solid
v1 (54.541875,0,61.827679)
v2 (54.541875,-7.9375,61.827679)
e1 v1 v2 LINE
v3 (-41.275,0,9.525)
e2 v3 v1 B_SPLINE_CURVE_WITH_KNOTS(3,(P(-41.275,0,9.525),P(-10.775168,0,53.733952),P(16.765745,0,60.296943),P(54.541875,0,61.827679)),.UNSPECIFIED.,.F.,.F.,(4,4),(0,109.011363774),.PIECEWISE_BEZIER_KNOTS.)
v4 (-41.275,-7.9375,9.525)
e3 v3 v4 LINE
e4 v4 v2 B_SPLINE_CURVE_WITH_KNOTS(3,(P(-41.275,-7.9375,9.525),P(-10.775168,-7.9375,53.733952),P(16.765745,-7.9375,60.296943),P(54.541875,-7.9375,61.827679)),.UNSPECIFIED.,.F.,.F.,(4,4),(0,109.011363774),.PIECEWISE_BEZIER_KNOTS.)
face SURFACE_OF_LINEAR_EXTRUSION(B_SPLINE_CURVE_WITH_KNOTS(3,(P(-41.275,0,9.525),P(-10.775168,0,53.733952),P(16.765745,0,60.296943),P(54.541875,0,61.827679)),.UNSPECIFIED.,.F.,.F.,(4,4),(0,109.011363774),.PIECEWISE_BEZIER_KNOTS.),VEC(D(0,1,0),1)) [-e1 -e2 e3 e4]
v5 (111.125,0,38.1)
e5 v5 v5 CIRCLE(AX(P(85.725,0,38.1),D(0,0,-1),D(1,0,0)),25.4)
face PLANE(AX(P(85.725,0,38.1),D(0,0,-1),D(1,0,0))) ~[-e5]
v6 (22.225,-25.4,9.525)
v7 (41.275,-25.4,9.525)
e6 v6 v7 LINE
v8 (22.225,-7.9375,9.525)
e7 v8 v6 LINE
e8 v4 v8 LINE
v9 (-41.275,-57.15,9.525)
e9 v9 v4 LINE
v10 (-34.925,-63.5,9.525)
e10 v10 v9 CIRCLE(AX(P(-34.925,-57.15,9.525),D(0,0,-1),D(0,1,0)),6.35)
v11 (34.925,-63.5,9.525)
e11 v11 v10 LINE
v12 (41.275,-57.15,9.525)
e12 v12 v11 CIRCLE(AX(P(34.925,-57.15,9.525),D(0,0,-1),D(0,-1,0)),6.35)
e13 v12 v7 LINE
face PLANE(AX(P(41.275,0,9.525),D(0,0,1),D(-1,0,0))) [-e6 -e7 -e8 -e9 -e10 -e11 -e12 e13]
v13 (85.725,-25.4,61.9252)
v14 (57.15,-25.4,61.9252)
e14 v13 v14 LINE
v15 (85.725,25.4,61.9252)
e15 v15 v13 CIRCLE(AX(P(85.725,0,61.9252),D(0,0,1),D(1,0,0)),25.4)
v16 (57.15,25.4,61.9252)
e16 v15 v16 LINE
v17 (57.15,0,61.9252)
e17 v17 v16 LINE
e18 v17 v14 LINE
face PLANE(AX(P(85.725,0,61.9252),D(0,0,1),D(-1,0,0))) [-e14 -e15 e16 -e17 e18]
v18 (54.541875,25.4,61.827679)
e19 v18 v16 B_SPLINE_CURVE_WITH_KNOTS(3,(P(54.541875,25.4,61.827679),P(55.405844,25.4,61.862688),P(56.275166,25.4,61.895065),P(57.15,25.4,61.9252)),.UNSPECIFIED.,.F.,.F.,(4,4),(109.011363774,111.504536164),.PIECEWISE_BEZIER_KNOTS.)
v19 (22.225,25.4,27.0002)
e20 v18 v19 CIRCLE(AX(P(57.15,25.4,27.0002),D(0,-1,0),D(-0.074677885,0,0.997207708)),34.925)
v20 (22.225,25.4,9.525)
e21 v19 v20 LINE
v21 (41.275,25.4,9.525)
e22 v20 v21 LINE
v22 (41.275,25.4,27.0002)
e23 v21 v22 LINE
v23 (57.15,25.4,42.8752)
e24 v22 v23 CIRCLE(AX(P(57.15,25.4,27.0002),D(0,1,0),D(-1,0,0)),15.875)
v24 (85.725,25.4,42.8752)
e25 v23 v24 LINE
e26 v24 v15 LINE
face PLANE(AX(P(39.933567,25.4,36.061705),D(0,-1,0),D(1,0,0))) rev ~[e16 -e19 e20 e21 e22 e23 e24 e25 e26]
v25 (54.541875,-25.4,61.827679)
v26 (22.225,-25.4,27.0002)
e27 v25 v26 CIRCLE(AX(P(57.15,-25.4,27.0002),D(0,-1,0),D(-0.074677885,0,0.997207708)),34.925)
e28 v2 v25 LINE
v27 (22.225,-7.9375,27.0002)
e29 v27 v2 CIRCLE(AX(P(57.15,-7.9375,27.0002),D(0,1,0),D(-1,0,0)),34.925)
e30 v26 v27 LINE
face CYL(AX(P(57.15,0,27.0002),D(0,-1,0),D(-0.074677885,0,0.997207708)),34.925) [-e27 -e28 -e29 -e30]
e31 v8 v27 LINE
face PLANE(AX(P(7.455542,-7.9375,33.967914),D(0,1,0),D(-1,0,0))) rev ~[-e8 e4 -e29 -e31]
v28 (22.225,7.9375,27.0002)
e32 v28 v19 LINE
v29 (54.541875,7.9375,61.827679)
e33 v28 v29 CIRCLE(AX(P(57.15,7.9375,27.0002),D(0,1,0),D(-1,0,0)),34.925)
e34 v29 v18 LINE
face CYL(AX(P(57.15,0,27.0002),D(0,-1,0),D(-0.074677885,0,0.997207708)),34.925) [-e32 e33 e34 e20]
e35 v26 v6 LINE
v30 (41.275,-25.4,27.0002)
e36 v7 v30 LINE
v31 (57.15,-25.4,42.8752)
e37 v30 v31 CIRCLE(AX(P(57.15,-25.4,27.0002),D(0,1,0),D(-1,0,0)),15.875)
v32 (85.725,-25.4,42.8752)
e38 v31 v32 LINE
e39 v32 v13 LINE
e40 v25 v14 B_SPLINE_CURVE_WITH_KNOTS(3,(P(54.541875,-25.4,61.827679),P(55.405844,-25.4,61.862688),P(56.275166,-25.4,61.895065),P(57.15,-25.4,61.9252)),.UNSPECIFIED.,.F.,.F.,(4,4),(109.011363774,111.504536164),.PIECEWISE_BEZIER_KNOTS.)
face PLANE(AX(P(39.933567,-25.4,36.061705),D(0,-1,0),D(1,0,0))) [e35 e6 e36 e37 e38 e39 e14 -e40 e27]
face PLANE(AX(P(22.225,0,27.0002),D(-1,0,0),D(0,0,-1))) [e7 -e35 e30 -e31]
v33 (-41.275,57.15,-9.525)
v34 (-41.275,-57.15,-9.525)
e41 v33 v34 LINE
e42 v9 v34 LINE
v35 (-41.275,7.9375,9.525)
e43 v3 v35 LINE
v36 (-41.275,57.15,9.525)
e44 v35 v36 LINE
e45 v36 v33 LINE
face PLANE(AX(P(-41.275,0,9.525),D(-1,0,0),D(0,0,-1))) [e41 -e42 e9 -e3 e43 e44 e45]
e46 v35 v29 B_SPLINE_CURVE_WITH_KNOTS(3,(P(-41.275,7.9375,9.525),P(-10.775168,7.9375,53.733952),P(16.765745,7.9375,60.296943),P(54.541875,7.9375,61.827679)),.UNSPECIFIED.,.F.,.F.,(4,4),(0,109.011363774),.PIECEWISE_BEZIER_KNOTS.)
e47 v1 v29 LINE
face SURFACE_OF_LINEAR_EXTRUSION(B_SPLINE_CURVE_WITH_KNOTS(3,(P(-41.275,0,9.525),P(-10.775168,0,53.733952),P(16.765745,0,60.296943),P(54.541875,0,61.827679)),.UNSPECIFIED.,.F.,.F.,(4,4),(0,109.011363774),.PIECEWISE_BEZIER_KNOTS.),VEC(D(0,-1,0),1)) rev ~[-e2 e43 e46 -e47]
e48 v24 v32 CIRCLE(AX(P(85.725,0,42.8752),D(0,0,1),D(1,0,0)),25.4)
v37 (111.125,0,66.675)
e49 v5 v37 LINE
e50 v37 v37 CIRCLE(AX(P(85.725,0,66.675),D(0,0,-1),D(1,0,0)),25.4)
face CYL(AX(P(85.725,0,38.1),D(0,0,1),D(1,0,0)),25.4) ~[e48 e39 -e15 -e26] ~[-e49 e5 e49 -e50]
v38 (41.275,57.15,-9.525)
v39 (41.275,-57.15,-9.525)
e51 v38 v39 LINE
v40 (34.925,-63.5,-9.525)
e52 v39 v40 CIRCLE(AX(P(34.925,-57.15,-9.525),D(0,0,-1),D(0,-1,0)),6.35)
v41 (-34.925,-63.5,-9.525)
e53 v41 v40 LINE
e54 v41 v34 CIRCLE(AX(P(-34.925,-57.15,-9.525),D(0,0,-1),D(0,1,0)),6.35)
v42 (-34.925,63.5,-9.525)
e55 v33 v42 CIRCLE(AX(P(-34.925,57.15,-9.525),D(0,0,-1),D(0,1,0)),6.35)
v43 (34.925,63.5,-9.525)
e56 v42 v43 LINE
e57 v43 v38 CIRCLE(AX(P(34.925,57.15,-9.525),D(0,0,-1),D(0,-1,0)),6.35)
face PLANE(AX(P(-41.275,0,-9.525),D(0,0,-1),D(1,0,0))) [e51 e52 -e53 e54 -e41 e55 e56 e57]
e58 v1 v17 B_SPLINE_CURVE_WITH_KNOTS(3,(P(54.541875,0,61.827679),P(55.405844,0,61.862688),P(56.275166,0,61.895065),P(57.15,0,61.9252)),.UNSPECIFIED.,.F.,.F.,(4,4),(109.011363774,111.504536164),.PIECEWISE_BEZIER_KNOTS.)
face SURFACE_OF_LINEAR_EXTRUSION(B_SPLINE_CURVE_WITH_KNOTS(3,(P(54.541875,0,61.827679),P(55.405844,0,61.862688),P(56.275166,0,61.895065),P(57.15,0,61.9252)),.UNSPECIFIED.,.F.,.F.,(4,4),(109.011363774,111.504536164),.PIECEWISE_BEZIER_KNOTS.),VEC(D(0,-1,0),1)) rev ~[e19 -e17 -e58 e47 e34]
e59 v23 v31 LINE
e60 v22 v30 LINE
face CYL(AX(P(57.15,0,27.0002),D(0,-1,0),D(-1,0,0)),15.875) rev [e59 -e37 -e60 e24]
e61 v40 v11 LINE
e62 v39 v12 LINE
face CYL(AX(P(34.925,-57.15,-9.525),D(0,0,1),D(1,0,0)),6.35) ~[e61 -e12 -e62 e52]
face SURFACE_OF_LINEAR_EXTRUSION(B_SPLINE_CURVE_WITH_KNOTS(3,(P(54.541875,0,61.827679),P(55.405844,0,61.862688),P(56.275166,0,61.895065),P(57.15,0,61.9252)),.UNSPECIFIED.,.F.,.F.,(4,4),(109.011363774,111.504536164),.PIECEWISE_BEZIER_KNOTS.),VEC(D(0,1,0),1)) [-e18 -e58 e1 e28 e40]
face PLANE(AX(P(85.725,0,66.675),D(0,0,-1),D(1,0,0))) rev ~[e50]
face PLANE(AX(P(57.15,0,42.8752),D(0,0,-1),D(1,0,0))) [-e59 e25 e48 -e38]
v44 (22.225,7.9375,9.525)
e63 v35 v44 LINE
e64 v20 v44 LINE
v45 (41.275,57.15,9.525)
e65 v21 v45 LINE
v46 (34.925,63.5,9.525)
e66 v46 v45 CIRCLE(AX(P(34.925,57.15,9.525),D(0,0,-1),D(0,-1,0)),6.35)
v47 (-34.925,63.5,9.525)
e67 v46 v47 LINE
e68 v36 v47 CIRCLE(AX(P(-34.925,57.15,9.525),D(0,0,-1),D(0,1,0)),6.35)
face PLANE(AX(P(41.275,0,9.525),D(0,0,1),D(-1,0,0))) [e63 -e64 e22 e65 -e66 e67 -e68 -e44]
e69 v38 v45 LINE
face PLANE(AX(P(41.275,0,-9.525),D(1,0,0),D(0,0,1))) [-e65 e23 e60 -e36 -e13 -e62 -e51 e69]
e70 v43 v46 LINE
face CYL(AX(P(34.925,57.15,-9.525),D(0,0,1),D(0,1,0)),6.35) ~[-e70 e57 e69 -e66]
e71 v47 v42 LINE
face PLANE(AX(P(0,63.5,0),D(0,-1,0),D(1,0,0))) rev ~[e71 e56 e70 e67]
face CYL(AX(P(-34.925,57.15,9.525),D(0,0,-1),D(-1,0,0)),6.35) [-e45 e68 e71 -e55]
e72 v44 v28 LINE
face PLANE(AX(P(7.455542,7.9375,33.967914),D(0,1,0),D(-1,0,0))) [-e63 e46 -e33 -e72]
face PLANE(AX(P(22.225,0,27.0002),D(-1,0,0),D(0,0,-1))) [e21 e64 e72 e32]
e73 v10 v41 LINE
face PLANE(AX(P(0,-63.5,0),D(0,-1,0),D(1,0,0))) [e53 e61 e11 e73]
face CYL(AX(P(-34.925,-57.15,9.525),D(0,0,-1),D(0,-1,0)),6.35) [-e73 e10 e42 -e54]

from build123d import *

# Parameters (mm, degrees)
F1_DEPTH = 63.5
F0_W     = 25.4
F0_H     = 19.05
F2_DEPTH = 25.4
F3_DEPTH = 7.9375
F5_R     = 6.35
F6_R     = 6.35
F7_R     = 6.35
F8_R     = 6.35


# Not quite as in the source:
# - a feature names something its author has since deleted; it is built from what else it names


with BuildPart() as f1:
    # F0 (on Front) → F1 (new body, symmetric)
    with BuildSketch(Plane.XZ):
        Polygon((22.225, 9.525), (-41.275, 9.525), (-41.275, -9.525), (41.275, -9.525), (41.275, 9.525), align=None)
    extrude(amount=F1_DEPTH, both=True)

    # F0 (on Front) → F2 (join, symmetric)
    with BuildSketch(Plane.XZ):
        with BuildLine():
            Line((22.225, 27.0002), (22.225, 9.525))
            Line((22.225, 9.525), (41.275, 9.525))
            Line((41.275, 9.525), (41.275, 27.0002))
            ThreePointArc((41.275, 27.0002), (45.9246798487, 38.2255201513), (57.15, 42.8752))
            Line((57.15, 42.8752), (60.325, 42.8752))
            Line((60.325, 42.8752), (60.325, 61.9252))
            Line((60.325, 61.9252), (57.15, 61.9252))
            add(Edge.make_bspline(
                [(54.5418748685, 61.8276792125), (55.4058435477, 61.8626883172), (56.2751659775, 61.8950651933), (57.15, 61.9252)],
                knots=[109.0113637744, 109.0113637744, 109.0113637744, 109.0113637744, 111.5045361635, 111.5045361635, 111.5045361635, 111.5045361635], degree=3))
            ThreePointArc((54.5418748685, 61.8276792125), (31.5487852318, 50.7559030498), (22.225, 27.0002))
        make_face()
        with Locations((73.025, 52.4002)):
            Rectangle(F0_W, F0_H)
    extrude(amount=F2_DEPTH, both=True)

    # F0 (on Front) → F3 (join, symmetric)
    with BuildSketch(Plane.XZ):
        with BuildLine():
            add(Edge.make_bspline(
                [(-41.275, 9.525), (-10.7751676539, 53.7339523615), (16.7657449889, 60.2969426058), (54.5418748685, 61.8276792125)],
                knots=[0, 0, 0, 0, 109.0113637744, 109.0113637744, 109.0113637744, 109.0113637744], degree=3))
            Line((-41.275, 9.525), (22.225, 9.525))
            Line((22.225, 9.525), (22.225, 27.0002))
            ThreePointArc((22.225, 27.0002), (31.5487852318, 50.7559030498), (54.5418748685, 61.8276792125))
        make_face()
    extrude(amount=F3_DEPTH, both=True)

    # F0 (on Front) → F4 (revolve)
    with BuildSketch(Plane.XZ):
        Polygon((85.725, 66.675), (85.725, 61.9252), (85.725, 42.8752), (85.725, 38.1), (111.125, 38.1), (111.125, 66.675), align=None)
    revolve(axis=Axis((85.725, 0, 52.3875), (0, 0, -1)))

    # F5
    f5_edges = [f1.edges().sort_by_distance(p)[0] for p in [
        (41.275, -63.5, 0),
    ]]
    fillet(f5_edges, radius=F5_R)

    # F6
    f6_edges = [f1.edges().sort_by_distance(p)[0] for p in [
        (-41.275, -63.5, 0),
    ]]
    fillet(f6_edges, radius=F6_R)

    # F7
    f7_edges = [f1.edges().sort_by_distance(p)[0] for p in [
        (-41.275, 63.5, 0),
    ]]
    fillet(f7_edges, radius=F7_R)

    # F8
    f8_edges = [f1.edges().sort_by_distance(p)[0] for p in [
        (41.275, 63.5, 0),
    ]]
    fillet(f8_edges, radius=F8_R)


solid = f1.part
